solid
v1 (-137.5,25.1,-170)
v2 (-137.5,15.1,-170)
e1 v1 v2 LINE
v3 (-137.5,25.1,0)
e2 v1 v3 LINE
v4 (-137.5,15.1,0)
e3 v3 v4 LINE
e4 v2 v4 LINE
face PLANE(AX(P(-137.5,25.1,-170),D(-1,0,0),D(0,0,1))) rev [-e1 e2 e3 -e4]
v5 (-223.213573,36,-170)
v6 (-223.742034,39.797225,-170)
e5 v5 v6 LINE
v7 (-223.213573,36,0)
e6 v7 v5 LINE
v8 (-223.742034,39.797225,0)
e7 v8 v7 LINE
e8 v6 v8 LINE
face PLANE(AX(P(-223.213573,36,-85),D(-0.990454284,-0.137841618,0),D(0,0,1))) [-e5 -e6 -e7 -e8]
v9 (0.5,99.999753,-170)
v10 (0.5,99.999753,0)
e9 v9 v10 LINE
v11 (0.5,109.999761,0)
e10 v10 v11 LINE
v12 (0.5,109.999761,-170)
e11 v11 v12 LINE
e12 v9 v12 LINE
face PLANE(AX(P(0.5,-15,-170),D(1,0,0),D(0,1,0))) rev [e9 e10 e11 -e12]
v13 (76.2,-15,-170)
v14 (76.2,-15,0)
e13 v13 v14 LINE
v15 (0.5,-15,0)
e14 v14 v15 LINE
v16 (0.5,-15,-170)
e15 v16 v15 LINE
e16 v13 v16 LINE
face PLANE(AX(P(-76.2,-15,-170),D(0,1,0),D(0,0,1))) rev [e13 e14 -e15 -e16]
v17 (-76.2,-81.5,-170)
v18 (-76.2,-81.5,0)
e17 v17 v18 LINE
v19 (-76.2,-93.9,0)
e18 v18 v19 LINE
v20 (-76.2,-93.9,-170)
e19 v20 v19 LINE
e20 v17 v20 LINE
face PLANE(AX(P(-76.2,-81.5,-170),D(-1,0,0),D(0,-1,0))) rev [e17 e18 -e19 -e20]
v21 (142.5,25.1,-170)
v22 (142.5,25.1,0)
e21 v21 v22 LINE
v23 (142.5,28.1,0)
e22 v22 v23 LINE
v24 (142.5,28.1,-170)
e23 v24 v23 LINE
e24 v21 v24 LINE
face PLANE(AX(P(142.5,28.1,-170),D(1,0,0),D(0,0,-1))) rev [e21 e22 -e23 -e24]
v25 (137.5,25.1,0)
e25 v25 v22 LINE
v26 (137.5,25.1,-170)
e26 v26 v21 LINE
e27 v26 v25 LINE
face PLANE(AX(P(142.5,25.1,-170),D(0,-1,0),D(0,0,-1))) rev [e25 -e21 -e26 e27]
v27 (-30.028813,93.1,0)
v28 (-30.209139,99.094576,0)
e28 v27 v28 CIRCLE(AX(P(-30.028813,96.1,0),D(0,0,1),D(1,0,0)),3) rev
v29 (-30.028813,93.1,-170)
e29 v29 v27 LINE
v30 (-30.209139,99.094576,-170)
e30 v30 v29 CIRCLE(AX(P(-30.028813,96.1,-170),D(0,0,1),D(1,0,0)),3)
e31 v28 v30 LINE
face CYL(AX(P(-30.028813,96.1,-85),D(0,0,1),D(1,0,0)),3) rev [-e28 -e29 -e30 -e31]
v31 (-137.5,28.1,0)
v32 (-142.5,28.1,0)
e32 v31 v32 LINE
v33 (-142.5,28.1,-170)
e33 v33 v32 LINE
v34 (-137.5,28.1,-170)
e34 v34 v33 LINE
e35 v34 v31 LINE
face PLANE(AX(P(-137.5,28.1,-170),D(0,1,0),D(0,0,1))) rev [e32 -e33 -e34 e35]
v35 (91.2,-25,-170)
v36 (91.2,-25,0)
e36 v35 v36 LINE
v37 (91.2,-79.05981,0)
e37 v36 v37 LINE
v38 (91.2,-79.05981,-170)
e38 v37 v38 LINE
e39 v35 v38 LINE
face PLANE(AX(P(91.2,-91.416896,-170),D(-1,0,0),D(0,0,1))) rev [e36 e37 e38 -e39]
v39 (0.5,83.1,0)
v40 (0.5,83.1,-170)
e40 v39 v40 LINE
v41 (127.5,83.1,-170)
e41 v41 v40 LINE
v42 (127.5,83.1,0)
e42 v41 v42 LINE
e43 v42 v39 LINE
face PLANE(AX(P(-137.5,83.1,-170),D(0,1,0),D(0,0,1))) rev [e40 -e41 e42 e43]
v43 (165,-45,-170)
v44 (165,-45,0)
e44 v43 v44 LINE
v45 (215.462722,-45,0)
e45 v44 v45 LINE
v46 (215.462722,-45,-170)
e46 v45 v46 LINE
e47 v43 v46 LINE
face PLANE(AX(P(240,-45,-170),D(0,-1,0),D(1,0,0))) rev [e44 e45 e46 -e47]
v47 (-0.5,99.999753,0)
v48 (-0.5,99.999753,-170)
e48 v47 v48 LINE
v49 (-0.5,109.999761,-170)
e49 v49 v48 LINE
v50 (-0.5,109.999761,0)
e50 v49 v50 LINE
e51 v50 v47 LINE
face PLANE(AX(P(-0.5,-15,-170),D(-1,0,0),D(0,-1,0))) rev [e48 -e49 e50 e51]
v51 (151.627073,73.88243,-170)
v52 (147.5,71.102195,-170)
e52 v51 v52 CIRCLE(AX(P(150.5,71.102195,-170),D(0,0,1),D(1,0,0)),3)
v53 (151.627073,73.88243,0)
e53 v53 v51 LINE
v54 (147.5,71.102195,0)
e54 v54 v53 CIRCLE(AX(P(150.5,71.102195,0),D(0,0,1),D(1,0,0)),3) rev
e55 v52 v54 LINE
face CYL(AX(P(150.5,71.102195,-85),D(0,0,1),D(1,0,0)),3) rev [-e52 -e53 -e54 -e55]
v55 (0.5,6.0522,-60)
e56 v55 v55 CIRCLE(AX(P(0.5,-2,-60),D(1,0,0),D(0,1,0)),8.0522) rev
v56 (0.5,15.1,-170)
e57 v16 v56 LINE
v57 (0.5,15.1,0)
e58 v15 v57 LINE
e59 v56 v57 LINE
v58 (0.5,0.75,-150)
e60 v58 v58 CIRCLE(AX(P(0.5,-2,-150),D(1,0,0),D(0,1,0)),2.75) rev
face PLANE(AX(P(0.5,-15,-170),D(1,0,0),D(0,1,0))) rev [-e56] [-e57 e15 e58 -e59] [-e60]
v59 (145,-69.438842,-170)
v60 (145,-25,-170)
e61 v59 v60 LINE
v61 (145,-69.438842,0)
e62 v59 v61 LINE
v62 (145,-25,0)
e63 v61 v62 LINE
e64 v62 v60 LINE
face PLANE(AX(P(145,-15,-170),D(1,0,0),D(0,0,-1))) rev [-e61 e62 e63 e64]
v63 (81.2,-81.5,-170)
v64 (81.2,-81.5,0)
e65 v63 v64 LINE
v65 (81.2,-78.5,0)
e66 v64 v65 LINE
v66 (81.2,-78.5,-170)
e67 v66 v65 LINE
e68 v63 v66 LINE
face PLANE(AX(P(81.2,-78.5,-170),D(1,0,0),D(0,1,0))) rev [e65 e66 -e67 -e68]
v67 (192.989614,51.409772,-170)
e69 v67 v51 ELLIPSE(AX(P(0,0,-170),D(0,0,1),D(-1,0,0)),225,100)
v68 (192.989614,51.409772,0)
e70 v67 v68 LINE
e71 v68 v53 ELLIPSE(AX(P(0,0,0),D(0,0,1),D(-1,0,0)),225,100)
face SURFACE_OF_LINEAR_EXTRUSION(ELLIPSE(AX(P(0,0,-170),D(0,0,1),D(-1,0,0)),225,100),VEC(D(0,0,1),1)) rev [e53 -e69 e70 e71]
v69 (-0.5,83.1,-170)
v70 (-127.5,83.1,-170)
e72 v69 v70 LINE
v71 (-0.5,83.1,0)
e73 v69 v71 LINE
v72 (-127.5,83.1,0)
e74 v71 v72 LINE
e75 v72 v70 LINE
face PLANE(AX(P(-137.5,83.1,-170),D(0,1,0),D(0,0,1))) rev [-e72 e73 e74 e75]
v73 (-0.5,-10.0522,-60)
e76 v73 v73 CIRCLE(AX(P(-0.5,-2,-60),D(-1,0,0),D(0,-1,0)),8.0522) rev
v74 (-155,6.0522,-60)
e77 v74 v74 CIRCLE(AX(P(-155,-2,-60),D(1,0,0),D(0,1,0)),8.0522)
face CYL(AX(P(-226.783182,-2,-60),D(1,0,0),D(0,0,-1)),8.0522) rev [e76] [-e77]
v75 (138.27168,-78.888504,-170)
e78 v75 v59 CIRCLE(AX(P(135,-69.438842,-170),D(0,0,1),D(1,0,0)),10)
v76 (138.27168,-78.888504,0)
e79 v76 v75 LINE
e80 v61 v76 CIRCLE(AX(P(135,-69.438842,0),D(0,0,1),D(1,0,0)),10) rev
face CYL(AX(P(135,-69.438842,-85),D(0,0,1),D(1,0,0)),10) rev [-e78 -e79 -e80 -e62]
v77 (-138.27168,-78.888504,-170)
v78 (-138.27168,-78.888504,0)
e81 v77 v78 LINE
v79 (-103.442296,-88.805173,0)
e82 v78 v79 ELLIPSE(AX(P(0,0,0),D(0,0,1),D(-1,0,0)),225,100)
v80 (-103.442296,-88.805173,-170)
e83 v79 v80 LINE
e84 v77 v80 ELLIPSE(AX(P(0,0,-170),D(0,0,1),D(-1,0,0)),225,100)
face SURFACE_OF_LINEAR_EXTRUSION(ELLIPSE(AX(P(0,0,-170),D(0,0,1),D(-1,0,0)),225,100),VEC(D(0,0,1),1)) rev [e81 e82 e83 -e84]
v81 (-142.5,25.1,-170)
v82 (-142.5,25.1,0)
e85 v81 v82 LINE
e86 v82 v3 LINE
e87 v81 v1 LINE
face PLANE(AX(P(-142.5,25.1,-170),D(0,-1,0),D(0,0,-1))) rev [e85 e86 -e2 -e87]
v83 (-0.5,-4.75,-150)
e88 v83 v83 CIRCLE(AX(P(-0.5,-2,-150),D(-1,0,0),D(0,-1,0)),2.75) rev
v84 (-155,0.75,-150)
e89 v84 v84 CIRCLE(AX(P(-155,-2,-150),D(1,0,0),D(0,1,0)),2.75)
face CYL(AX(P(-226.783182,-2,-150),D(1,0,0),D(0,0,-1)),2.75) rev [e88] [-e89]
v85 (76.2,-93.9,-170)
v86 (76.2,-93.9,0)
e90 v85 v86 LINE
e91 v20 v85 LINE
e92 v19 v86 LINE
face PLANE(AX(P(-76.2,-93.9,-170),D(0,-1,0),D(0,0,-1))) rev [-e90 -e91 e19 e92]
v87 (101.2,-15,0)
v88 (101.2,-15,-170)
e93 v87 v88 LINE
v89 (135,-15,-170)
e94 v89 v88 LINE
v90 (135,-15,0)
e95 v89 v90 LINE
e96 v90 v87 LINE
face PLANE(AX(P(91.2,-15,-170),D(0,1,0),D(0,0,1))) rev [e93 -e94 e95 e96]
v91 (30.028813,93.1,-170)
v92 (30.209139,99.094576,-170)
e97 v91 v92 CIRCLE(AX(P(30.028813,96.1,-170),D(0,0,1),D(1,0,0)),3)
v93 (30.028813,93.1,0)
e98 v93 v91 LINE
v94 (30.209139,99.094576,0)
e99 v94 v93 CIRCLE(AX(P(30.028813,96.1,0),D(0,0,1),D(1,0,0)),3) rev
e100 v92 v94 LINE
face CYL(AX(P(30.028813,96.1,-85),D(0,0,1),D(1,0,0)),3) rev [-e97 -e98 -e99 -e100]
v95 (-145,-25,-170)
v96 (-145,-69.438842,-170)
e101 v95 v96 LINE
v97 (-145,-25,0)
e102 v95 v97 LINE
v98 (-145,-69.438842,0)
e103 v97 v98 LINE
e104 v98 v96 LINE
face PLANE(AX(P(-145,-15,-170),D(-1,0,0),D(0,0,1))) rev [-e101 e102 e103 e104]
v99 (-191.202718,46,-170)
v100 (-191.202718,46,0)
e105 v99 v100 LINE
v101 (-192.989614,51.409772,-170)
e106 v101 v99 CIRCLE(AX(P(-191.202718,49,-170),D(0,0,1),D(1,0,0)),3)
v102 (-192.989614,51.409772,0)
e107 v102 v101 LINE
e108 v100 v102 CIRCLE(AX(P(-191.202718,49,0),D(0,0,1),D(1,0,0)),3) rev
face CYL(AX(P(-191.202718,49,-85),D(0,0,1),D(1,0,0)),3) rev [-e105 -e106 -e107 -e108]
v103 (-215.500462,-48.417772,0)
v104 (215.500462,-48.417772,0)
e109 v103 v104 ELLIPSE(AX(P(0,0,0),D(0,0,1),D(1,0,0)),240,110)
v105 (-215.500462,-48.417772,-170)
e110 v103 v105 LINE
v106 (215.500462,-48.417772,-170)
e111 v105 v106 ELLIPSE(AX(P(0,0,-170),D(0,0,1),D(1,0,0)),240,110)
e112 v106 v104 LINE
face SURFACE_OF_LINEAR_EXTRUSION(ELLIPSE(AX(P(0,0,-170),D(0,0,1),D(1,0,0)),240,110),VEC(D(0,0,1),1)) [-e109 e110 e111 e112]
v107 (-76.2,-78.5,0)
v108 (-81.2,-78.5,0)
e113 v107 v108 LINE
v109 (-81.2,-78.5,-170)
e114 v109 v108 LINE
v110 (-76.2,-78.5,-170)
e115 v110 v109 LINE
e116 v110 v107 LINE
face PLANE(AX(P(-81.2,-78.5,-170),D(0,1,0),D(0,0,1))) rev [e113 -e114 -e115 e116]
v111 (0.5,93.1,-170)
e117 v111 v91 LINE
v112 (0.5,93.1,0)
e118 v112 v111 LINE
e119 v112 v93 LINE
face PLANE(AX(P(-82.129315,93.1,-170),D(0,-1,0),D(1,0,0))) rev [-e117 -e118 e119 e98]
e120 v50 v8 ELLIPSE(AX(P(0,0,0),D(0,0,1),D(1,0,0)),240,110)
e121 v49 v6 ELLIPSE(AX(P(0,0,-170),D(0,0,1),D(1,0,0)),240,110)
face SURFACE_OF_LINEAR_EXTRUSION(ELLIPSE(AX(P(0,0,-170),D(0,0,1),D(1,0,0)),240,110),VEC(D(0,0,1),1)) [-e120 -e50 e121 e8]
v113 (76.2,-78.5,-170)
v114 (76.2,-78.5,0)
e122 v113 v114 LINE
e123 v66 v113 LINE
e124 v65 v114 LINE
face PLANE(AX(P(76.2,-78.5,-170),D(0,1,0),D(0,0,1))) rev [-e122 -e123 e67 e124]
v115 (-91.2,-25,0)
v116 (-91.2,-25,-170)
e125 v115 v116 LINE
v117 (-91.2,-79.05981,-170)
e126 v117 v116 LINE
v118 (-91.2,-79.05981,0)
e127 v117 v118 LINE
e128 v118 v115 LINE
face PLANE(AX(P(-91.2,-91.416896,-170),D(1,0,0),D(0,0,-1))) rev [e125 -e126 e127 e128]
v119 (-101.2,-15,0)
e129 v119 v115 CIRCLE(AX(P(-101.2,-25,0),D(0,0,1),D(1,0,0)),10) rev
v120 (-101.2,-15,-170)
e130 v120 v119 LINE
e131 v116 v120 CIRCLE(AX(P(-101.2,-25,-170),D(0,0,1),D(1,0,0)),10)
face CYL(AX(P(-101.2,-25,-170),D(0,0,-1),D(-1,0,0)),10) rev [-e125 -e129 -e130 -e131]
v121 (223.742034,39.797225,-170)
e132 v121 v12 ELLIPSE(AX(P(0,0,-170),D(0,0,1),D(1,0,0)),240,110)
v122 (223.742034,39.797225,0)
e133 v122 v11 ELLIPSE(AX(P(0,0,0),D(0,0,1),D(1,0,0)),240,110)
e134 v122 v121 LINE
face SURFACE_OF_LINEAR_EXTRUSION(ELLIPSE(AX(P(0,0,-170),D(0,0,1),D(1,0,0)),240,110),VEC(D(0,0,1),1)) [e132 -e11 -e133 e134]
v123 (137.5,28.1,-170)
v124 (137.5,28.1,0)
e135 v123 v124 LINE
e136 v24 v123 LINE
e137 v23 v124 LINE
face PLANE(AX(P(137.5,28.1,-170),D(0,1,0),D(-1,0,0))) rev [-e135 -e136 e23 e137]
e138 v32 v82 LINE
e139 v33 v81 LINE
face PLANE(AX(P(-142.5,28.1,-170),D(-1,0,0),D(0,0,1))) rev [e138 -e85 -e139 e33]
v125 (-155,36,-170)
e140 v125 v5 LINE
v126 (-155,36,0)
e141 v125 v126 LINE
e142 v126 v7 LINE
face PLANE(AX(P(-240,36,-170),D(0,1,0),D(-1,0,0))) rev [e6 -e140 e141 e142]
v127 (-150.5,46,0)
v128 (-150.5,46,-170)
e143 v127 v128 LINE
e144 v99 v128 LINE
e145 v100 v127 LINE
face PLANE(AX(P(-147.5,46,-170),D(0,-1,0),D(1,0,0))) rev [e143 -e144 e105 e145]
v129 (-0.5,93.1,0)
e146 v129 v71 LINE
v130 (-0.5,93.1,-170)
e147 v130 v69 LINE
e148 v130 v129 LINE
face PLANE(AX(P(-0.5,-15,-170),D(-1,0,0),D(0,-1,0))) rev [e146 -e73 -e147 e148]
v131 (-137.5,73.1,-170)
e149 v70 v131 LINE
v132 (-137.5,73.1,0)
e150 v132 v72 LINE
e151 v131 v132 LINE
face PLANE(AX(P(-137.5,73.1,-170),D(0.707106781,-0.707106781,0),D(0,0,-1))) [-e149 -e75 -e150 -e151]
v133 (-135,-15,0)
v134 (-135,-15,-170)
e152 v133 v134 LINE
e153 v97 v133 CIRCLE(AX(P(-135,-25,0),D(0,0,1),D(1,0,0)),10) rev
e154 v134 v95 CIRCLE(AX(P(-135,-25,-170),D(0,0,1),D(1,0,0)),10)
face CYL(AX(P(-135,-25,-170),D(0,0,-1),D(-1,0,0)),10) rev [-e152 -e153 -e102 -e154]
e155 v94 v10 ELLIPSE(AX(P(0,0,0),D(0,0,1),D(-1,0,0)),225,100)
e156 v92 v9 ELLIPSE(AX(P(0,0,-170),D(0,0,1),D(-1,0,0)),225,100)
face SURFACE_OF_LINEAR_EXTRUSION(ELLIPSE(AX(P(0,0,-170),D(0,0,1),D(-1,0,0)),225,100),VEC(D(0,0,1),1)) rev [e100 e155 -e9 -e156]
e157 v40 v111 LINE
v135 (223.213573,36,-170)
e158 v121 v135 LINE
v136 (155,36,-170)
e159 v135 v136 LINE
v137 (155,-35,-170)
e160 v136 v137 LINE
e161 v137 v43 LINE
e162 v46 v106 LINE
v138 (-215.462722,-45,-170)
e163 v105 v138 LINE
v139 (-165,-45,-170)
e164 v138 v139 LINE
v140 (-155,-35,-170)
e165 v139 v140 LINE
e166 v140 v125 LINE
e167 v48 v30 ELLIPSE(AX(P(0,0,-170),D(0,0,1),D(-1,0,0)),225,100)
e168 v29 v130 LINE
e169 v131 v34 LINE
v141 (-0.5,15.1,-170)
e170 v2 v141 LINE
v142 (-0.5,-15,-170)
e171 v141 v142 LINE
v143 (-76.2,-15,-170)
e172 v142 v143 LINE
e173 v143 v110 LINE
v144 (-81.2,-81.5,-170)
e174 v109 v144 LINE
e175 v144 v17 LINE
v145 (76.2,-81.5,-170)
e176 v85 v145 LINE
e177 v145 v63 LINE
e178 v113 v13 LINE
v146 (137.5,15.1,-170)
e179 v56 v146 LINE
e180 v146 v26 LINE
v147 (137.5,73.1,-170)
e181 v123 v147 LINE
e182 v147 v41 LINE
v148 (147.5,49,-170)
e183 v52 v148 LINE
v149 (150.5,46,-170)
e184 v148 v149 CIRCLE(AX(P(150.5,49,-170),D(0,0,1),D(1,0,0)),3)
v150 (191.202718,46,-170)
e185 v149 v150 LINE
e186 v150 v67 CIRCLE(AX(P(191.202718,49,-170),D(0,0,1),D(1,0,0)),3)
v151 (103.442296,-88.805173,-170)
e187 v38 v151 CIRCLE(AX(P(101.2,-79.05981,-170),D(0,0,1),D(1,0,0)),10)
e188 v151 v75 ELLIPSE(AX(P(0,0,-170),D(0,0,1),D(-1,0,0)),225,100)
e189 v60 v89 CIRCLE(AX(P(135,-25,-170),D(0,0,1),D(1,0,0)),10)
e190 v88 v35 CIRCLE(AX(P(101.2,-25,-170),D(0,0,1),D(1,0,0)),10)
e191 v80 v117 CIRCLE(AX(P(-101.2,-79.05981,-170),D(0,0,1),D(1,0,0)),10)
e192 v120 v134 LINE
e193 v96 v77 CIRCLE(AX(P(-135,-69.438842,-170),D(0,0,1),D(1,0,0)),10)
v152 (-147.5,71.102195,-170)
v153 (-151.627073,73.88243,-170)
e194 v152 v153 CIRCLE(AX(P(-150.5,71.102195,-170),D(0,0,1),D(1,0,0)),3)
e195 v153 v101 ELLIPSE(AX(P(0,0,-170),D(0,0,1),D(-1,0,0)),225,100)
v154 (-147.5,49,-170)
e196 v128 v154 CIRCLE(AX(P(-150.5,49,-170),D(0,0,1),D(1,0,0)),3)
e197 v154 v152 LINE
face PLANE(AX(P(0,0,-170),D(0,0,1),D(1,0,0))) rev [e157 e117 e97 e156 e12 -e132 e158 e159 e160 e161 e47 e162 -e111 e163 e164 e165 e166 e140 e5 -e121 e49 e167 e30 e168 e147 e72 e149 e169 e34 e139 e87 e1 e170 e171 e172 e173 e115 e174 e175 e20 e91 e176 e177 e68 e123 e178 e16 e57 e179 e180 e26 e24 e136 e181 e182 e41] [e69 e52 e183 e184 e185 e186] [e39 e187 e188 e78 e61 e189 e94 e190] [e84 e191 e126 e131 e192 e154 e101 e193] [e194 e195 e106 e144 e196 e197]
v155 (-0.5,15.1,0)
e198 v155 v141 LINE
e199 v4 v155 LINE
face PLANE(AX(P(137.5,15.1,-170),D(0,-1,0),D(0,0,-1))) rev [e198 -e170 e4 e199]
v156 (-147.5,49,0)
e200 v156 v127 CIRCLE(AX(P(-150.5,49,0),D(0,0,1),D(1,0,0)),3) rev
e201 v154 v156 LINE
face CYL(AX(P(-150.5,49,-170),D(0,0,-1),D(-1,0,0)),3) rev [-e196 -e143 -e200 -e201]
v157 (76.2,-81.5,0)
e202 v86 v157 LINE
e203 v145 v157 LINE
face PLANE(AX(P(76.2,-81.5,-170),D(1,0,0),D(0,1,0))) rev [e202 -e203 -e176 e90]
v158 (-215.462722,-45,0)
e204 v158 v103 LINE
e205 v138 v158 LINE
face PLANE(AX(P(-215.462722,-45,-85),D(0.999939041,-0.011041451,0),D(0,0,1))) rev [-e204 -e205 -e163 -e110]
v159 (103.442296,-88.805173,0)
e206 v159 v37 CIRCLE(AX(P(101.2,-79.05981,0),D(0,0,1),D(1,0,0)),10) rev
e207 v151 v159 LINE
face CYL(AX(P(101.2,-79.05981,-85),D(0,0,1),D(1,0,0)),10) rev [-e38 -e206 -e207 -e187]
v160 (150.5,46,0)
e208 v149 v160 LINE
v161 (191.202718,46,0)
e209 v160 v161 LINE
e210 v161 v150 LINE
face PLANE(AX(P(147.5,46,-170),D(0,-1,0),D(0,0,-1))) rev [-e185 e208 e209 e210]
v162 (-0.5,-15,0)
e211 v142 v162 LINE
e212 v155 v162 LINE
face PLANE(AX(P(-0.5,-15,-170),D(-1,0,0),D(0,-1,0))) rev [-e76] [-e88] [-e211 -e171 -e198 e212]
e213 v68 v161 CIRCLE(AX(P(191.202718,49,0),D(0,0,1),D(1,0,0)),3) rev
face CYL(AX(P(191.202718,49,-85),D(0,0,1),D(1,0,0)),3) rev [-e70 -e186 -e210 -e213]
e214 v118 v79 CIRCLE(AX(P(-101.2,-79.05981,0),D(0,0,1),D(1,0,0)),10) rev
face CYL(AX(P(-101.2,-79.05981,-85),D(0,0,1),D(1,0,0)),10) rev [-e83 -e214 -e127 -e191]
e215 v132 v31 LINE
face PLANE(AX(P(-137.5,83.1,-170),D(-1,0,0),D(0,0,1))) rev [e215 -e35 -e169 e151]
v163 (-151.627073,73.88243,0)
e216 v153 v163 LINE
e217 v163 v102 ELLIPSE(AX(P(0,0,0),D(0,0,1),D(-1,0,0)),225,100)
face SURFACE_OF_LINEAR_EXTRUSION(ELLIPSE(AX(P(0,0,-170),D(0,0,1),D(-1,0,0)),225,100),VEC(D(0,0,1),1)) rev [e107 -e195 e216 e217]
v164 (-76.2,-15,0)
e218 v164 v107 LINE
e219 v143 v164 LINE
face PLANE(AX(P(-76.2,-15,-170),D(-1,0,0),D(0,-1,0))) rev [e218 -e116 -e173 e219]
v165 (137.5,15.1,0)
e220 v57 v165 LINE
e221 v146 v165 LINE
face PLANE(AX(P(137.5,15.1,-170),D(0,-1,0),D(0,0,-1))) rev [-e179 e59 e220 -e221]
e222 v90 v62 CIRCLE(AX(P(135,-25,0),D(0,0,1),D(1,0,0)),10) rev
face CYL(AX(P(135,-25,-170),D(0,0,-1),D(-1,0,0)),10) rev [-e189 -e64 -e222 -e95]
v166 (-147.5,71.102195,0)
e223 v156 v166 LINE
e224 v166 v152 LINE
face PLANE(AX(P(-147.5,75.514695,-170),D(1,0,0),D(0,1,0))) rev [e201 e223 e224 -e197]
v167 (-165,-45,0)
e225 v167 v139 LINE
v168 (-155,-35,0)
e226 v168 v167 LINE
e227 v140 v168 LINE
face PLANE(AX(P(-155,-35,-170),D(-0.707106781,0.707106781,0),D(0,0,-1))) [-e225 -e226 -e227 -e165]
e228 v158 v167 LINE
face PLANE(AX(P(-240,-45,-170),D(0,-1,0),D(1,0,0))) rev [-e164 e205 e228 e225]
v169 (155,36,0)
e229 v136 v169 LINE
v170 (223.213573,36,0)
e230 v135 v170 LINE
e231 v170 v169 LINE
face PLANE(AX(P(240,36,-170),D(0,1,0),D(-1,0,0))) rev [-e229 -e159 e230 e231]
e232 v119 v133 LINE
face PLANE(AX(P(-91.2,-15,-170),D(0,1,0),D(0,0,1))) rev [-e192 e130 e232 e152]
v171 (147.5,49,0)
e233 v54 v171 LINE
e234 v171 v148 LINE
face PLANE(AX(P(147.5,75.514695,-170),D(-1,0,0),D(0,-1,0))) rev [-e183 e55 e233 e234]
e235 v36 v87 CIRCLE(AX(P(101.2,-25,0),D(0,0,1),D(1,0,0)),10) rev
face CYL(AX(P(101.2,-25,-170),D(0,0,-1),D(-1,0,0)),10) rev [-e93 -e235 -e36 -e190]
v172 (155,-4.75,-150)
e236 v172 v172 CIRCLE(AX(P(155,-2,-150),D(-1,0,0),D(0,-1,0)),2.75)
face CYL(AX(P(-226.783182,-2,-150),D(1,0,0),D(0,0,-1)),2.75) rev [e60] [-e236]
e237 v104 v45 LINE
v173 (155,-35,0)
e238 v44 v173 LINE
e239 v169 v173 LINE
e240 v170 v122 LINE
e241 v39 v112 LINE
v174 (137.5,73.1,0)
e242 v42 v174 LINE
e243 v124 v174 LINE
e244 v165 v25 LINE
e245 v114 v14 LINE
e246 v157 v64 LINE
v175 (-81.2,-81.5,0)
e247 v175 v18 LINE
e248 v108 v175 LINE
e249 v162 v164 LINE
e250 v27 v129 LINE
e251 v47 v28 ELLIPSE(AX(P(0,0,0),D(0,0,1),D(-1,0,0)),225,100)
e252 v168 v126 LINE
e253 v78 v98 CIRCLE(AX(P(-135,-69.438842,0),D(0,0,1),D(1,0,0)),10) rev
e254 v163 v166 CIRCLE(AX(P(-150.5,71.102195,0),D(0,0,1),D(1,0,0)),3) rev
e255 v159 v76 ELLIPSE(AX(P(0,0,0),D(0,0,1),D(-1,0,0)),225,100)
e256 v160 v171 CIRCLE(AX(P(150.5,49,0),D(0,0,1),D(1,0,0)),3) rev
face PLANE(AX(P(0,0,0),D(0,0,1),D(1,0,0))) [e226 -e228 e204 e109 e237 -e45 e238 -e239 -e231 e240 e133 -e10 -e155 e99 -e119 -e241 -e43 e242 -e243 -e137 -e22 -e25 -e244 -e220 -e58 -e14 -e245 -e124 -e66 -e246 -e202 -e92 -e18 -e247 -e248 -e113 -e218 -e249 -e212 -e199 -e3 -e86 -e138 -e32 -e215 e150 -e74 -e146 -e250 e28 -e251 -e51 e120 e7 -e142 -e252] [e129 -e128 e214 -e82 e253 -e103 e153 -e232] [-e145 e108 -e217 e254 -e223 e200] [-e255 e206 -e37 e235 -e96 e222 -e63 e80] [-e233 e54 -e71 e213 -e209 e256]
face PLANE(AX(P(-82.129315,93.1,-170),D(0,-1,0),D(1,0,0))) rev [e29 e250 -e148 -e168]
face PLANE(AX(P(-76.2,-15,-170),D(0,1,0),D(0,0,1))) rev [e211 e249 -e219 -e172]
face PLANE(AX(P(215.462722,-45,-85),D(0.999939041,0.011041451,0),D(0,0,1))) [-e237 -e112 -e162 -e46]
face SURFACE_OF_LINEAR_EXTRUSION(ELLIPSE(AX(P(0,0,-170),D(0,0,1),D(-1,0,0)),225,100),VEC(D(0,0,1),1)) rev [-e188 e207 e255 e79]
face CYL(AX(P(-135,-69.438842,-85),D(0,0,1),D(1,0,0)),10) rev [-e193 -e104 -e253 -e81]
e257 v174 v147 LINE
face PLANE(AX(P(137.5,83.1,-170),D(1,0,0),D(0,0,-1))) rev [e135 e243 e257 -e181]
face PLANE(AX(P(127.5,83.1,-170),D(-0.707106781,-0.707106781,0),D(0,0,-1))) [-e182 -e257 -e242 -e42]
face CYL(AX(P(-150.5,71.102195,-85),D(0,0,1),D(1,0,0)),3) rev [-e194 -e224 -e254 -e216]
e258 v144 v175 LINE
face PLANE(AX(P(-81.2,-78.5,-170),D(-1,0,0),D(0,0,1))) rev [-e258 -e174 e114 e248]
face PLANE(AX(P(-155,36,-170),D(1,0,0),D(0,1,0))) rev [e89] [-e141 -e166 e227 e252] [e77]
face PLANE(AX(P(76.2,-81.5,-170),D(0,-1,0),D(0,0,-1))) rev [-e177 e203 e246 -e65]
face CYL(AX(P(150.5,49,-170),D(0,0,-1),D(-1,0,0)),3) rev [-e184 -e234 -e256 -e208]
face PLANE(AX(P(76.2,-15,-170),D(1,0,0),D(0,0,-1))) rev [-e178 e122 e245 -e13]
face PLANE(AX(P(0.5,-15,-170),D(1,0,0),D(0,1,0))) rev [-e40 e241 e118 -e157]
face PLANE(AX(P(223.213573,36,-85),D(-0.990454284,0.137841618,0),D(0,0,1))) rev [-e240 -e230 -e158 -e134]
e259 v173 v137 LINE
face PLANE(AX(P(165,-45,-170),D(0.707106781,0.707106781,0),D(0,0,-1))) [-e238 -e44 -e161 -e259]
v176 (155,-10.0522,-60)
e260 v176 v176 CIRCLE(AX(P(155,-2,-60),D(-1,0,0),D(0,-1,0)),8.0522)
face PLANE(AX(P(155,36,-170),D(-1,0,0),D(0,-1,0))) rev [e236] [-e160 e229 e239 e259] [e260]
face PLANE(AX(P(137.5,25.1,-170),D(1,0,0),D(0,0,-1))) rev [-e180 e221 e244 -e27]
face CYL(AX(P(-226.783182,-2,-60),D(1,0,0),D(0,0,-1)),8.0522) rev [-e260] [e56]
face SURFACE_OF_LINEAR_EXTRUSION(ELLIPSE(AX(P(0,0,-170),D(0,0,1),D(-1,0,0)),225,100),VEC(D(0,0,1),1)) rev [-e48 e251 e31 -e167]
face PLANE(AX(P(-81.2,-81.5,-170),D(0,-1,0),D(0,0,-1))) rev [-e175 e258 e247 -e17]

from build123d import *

# Parameters (mm, degrees)
SKETCH1_RX              = 240
SKETCH1_RY              = 110
BOSS_EXTRUDE1_DEPTH     = 170
SKETCH9_W               = 85
SKETCH9_H               = 81
CUT_EXTRUDE4_DEPTH      = 315.006369362
CUT_EXTRUDE5_DEPTH      = 305.024031405
CUT_EXTRUDE6_DEPTH      = 305.024031405
CUT_EXTRUDE6_DEPTH_BACK = 305.024031405
SKETCH11_R              = 8.05220018
SKETCH11_R_2            = 2.75
CHAMFER1_START          = -171
CHAMFER1_DEPTH          = 172
CUT_EXTRUDE7_DEPTH      = 302.762319701
CHAMFER2_SIZE           = 10
CUT_EXTRUDE8_DEPTH      = 302.762319701
CUT_EXTRUDE8_DEPTH_BACK = 302.762319701
SKETCH14_W              = 1
SKETCH14_H              = 125
CUT_EXTRUDE9_DEPTH      = 302.762319832
CUT_EXTRUDE9_DEPTH_BACK = 302.762319832
FILLET1_R               = 10
FILLET2_R               = 3
CHAMFER4_SIZE           = 10


with BuildPart() as part:
    # Sketch1 → Boss-Extrude1 (new body)
    with BuildSketch(Plane.XY):
        with Locations((0, 0)):
            Ellipse(SKETCH1_RX, SKETCH1_RY)
    extrude(amount=-BOSS_EXTRUDE1_DEPTH)

    # Sketch9 → Cut-Extrude4 (cut, through all)
    with BuildSketch(Plane.XY):
        with Locations((197.5, -4.5)):
            Rectangle(SKETCH9_W, SKETCH9_H)
        with Locations((-197.5, -4.5)):
            Rectangle(SKETCH9_W, SKETCH9_H)
    extrude(amount=-CUT_EXTRUDE4_DEPTH, mode=Mode.SUBTRACT)

    # Sketch10 → Cut-Extrude5 (cut, through all)
    with BuildSketch(Plane.XY):
        Polygon((-137.5, 83.1), (137.5, 83.1), (137.5, 28.1), (142.5, 28.1), (142.5, 25.1), (137.5, 25.1), (137.5, 15.1), (-137.5, 15.1), (-137.5, 25.1), (-142.5, 25.1), (-142.5, 28.1), (-137.5, 28.1), align=None)
    extrude(amount=-CUT_EXTRUDE5_DEPTH, mode=Mode.SUBTRACT)

    # Sketch11 → Cut-Extrude6 (cut, two sides: drawn at the far end of the back side and taken through both)
    with BuildSketch(Plane(origin=(0, 0, 0), x_dir=(0, 0, -1), z_dir=(1, 0, 0)).offset(-CUT_EXTRUDE6_DEPTH_BACK)):
        with Locations(Location((60, -2, 0), (0, 0, 270))):
            Circle(SKETCH11_R)
        with Locations(Location((150, -2, 0), (0, 0, 270))):
            Circle(SKETCH11_R_2)
    extrude(amount=CUT_EXTRUDE6_DEPTH + CUT_EXTRUDE6_DEPTH_BACK, mode=Mode.SUBTRACT)

    # Chamfer1: read off the stored shape, not the designer's step
    # Chamfer1 outline → Chamfer1 (cut)
    with BuildSketch(Plane.XY.offset(CHAMFER1_START)):
        with BuildLine():
            add(Edge.make_bspline(
                [(226.783181851, 36), (225.338784139, 37.911428345), (223.742033582, 39.797224556)],
                knots=[0.33341591, 0.33341591, 0.33341591, 0.380954959, 0.380954959, 0.380954959], degree=2, weights=[1, 0.98707721, 0.974650902]))
            Line((223.742033582, 39.797224556), (223.213573476, 36))
            Line((223.213573476, 36), (226.783181851, 36))
        make_face()
        with BuildLine():
            Line((-223.213573476, 36), (-223.742033582, 39.797224556))
            add(Edge.make_bspline(
                [(-223.742033582, 39.797224556), (-225.338784139, 37.911428345), (-226.783181851, 36)],
                knots=[2.760637694, 2.760637694, 2.760637694, 2.808176743, 2.808176743, 2.808176743], degree=2, weights=[0.974650902, 0.98707721, 1]))
            Line((-226.783181851, 36), (-223.213573476, 36))
        make_face()
        with BuildLine():
            add(Edge.make_bspline(
                [(-218.998471635, -45), (-217.313455553, -46.722643886), (-215.500461662, -48.417772396)],
                knots=[3.563050222, 3.563050222, 3.563050222, 3.605808591, 3.605808591, 3.605808591], degree=2, weights=[1, 0.989008328, 0.978425575]))
            Line((-215.500461662, -48.417772396), (-215.462722195, -45))
            Line((-215.462722195, -45), (-218.998471635, -45))
        make_face()
        with BuildLine():
            Line((215.462722195, -45), (215.500461662, -48.417772396))
            add(Edge.make_bspline(
                [(215.500461662, -48.417772396), (217.313455553, -46.722643886), (218.998471635, -45)],
                knots=[5.818969369, 5.818969369, 5.818969369, 5.861727739, 5.861727739, 5.861727739], degree=2, weights=[0.978425575, 0.989008328, 1]))
            Line((218.998471635, -45), (215.462722195, -45))
        make_face()
    extrude(amount=CHAMFER1_DEPTH, mode=Mode.SUBTRACT)

    # Sketch13 → Cut-Extrude7 (cut, through all)
    with BuildSketch(Plane.XY):
        Polygon((-76.2, -81.5), (-76.2, -93.9), (76.2, -93.9), (76.2, -81.5), (81.2, -81.5), (81.2, -78.5), (76.2, -78.5), (76.2, -15), (-76.2, -15), (-76.2, -78.5), (-81.2, -78.5), (-81.2, -81.5), align=None)
    extrude(amount=-CUT_EXTRUDE7_DEPTH, mode=Mode.SUBTRACT)

    # Chamfer2
    chamfer2_edges = [part.edges().sort_by_distance(p)[0] for p in [
        (155, -45, -85),
        (-155, -45, -85),
    ]]
    chamfer(chamfer2_edges, length=CHAMFER2_SIZE)

    # Sketch14 → Cut-Extrude8 (cut, two sides: drawn at the far end of the back side and taken through both)
    with BuildSketch(Plane.XY.offset(-CUT_EXTRUDE8_DEPTH_BACK)):
        with Locations((0, 47.5)):
            Rectangle(SKETCH14_W, SKETCH14_H)
    extrude(amount=CUT_EXTRUDE8_DEPTH + CUT_EXTRUDE8_DEPTH_BACK, mode=Mode.SUBTRACT)

    # Sketch15 → Cut-Extrude9 (cut, two sides: drawn at the far end of the back side and taken through both)
    with BuildSketch(Plane.XY.offset(-CUT_EXTRUDE9_DEPTH_BACK)):
        with BuildLine():
            Line((147.5, 75.514694834), (147.5, 46))
            Line((147.5, 46), (199.781755924, 46))
            add(Edge.make_bspline(
                [(199.781755924, 46), (179.990233789, 62.979001801), (147.5, 75.514694834)],
                knots=[3.619587852, 3.619587852, 3.619587852, 3.997470903, 3.997470903, 3.997470903], degree=2, weights=[1, 0.982203587, 1]))
        make_face()
        with BuildLine():
            Line((91.2, -91.41689608), (91.2, -15))
            Line((91.2, -15), (145, -15))
            Line((145, -15), (145, -76.465113485))
            add(Edge.make_bspline(
                [(91.2, -91.41689608), (120.495747781, -85.643811522), (145, -76.465113485)],
                knots=[1.988139758, 1.988139758, 1.988139758, 2.27109284, 2.27109284, 2.27109284], degree=2, weights=[1, 0.990008876, 1]))
        make_face()
        with BuildLine():
            Line((-82.129314955, 93.1), (82.129314955, 93.1))
            add(Edge.make_bspline(
                [(82.129314955, 93.1), (0, 107.411385607), (-82.129314955, 93.1)],
                knots=[4.338735578, 4.338735578, 4.338735578, 5.086042382, 5.086042382, 5.086042382], degree=2, weights=[1, 0.931, 1]))
        make_face()
        with BuildLine():
            Line((-91.2, -91.41689608), (-91.2, -15))
            Line((-91.2, -15), (-145, -15))
            Line((-145, -15), (-145, -76.465113485))
            add(Edge.make_bspline(
                [(-145, -76.465113485), (-120.495747781, -85.643811522), (-91.2, -91.41689608)],
                knots=[0.870499814, 0.870499814, 0.870499814, 1.153452896, 1.153452896, 1.153452896], degree=2, weights=[1, 0.990008876, 1]))
        make_face()
        with BuildLine():
            Line((-147.5, 75.514694834), (-147.5, 46))
            Line((-147.5, 46), (-199.781755924, 46))
            add(Edge.make_bspline(
                [(-147.5, 75.514694834), (-179.990233789, 62.979001801), (-199.781755924, 46)],
                knots=[5.427307058, 5.427307058, 5.427307058, 5.805190109, 5.805190109, 5.805190109], degree=2, weights=[1, 0.982203587, 1]))
        make_face()
    extrude(amount=CUT_EXTRUDE9_DEPTH + CUT_EXTRUDE9_DEPTH_BACK, mode=Mode.SUBTRACT)

    # Fillet1
    fillet1_edges = [part.edges().sort_by_distance(p)[0] for p in [
        (-145, -15, -85),
        (-145, -76.465113485, -85),
        (-91.2, -91.41689608, -85),
        (145, -76.465113485, -85),
        (91.2, -91.41689608, -85),
        (91.2, -15, -85),
        (-91.2, -15, -85),
        (145, -15, -85),
    ]]
    fillet(fillet1_edges, radius=FILLET1_R)

    # Fillet2
    fillet2_edges = [part.edges().sort_by_distance(p)[0] for p in [
        (-82.129314955, 93.1, -85),
        (82.129314955, 93.1, -85),
        (199.781755924, 46, -85),
        (147.5, 75.514694834, -85),
        (147.5, 46, -85),
        (-147.5, 75.514694834, -85),
        (-147.5, 46, -85),
        (-199.781755924, 46, -85),
    ]]
    fillet(fillet2_edges, radius=FILLET2_R)

    # Chamfer4
    chamfer4_edges = [part.edges().sort_by_distance(p)[0] for p in [
        (-137.5, 83.1, -85),
        (137.5, 83.1, -85),
    ]]
    chamfer(chamfer4_edges, length=CHAMFER4_SIZE)


solid = part.part
